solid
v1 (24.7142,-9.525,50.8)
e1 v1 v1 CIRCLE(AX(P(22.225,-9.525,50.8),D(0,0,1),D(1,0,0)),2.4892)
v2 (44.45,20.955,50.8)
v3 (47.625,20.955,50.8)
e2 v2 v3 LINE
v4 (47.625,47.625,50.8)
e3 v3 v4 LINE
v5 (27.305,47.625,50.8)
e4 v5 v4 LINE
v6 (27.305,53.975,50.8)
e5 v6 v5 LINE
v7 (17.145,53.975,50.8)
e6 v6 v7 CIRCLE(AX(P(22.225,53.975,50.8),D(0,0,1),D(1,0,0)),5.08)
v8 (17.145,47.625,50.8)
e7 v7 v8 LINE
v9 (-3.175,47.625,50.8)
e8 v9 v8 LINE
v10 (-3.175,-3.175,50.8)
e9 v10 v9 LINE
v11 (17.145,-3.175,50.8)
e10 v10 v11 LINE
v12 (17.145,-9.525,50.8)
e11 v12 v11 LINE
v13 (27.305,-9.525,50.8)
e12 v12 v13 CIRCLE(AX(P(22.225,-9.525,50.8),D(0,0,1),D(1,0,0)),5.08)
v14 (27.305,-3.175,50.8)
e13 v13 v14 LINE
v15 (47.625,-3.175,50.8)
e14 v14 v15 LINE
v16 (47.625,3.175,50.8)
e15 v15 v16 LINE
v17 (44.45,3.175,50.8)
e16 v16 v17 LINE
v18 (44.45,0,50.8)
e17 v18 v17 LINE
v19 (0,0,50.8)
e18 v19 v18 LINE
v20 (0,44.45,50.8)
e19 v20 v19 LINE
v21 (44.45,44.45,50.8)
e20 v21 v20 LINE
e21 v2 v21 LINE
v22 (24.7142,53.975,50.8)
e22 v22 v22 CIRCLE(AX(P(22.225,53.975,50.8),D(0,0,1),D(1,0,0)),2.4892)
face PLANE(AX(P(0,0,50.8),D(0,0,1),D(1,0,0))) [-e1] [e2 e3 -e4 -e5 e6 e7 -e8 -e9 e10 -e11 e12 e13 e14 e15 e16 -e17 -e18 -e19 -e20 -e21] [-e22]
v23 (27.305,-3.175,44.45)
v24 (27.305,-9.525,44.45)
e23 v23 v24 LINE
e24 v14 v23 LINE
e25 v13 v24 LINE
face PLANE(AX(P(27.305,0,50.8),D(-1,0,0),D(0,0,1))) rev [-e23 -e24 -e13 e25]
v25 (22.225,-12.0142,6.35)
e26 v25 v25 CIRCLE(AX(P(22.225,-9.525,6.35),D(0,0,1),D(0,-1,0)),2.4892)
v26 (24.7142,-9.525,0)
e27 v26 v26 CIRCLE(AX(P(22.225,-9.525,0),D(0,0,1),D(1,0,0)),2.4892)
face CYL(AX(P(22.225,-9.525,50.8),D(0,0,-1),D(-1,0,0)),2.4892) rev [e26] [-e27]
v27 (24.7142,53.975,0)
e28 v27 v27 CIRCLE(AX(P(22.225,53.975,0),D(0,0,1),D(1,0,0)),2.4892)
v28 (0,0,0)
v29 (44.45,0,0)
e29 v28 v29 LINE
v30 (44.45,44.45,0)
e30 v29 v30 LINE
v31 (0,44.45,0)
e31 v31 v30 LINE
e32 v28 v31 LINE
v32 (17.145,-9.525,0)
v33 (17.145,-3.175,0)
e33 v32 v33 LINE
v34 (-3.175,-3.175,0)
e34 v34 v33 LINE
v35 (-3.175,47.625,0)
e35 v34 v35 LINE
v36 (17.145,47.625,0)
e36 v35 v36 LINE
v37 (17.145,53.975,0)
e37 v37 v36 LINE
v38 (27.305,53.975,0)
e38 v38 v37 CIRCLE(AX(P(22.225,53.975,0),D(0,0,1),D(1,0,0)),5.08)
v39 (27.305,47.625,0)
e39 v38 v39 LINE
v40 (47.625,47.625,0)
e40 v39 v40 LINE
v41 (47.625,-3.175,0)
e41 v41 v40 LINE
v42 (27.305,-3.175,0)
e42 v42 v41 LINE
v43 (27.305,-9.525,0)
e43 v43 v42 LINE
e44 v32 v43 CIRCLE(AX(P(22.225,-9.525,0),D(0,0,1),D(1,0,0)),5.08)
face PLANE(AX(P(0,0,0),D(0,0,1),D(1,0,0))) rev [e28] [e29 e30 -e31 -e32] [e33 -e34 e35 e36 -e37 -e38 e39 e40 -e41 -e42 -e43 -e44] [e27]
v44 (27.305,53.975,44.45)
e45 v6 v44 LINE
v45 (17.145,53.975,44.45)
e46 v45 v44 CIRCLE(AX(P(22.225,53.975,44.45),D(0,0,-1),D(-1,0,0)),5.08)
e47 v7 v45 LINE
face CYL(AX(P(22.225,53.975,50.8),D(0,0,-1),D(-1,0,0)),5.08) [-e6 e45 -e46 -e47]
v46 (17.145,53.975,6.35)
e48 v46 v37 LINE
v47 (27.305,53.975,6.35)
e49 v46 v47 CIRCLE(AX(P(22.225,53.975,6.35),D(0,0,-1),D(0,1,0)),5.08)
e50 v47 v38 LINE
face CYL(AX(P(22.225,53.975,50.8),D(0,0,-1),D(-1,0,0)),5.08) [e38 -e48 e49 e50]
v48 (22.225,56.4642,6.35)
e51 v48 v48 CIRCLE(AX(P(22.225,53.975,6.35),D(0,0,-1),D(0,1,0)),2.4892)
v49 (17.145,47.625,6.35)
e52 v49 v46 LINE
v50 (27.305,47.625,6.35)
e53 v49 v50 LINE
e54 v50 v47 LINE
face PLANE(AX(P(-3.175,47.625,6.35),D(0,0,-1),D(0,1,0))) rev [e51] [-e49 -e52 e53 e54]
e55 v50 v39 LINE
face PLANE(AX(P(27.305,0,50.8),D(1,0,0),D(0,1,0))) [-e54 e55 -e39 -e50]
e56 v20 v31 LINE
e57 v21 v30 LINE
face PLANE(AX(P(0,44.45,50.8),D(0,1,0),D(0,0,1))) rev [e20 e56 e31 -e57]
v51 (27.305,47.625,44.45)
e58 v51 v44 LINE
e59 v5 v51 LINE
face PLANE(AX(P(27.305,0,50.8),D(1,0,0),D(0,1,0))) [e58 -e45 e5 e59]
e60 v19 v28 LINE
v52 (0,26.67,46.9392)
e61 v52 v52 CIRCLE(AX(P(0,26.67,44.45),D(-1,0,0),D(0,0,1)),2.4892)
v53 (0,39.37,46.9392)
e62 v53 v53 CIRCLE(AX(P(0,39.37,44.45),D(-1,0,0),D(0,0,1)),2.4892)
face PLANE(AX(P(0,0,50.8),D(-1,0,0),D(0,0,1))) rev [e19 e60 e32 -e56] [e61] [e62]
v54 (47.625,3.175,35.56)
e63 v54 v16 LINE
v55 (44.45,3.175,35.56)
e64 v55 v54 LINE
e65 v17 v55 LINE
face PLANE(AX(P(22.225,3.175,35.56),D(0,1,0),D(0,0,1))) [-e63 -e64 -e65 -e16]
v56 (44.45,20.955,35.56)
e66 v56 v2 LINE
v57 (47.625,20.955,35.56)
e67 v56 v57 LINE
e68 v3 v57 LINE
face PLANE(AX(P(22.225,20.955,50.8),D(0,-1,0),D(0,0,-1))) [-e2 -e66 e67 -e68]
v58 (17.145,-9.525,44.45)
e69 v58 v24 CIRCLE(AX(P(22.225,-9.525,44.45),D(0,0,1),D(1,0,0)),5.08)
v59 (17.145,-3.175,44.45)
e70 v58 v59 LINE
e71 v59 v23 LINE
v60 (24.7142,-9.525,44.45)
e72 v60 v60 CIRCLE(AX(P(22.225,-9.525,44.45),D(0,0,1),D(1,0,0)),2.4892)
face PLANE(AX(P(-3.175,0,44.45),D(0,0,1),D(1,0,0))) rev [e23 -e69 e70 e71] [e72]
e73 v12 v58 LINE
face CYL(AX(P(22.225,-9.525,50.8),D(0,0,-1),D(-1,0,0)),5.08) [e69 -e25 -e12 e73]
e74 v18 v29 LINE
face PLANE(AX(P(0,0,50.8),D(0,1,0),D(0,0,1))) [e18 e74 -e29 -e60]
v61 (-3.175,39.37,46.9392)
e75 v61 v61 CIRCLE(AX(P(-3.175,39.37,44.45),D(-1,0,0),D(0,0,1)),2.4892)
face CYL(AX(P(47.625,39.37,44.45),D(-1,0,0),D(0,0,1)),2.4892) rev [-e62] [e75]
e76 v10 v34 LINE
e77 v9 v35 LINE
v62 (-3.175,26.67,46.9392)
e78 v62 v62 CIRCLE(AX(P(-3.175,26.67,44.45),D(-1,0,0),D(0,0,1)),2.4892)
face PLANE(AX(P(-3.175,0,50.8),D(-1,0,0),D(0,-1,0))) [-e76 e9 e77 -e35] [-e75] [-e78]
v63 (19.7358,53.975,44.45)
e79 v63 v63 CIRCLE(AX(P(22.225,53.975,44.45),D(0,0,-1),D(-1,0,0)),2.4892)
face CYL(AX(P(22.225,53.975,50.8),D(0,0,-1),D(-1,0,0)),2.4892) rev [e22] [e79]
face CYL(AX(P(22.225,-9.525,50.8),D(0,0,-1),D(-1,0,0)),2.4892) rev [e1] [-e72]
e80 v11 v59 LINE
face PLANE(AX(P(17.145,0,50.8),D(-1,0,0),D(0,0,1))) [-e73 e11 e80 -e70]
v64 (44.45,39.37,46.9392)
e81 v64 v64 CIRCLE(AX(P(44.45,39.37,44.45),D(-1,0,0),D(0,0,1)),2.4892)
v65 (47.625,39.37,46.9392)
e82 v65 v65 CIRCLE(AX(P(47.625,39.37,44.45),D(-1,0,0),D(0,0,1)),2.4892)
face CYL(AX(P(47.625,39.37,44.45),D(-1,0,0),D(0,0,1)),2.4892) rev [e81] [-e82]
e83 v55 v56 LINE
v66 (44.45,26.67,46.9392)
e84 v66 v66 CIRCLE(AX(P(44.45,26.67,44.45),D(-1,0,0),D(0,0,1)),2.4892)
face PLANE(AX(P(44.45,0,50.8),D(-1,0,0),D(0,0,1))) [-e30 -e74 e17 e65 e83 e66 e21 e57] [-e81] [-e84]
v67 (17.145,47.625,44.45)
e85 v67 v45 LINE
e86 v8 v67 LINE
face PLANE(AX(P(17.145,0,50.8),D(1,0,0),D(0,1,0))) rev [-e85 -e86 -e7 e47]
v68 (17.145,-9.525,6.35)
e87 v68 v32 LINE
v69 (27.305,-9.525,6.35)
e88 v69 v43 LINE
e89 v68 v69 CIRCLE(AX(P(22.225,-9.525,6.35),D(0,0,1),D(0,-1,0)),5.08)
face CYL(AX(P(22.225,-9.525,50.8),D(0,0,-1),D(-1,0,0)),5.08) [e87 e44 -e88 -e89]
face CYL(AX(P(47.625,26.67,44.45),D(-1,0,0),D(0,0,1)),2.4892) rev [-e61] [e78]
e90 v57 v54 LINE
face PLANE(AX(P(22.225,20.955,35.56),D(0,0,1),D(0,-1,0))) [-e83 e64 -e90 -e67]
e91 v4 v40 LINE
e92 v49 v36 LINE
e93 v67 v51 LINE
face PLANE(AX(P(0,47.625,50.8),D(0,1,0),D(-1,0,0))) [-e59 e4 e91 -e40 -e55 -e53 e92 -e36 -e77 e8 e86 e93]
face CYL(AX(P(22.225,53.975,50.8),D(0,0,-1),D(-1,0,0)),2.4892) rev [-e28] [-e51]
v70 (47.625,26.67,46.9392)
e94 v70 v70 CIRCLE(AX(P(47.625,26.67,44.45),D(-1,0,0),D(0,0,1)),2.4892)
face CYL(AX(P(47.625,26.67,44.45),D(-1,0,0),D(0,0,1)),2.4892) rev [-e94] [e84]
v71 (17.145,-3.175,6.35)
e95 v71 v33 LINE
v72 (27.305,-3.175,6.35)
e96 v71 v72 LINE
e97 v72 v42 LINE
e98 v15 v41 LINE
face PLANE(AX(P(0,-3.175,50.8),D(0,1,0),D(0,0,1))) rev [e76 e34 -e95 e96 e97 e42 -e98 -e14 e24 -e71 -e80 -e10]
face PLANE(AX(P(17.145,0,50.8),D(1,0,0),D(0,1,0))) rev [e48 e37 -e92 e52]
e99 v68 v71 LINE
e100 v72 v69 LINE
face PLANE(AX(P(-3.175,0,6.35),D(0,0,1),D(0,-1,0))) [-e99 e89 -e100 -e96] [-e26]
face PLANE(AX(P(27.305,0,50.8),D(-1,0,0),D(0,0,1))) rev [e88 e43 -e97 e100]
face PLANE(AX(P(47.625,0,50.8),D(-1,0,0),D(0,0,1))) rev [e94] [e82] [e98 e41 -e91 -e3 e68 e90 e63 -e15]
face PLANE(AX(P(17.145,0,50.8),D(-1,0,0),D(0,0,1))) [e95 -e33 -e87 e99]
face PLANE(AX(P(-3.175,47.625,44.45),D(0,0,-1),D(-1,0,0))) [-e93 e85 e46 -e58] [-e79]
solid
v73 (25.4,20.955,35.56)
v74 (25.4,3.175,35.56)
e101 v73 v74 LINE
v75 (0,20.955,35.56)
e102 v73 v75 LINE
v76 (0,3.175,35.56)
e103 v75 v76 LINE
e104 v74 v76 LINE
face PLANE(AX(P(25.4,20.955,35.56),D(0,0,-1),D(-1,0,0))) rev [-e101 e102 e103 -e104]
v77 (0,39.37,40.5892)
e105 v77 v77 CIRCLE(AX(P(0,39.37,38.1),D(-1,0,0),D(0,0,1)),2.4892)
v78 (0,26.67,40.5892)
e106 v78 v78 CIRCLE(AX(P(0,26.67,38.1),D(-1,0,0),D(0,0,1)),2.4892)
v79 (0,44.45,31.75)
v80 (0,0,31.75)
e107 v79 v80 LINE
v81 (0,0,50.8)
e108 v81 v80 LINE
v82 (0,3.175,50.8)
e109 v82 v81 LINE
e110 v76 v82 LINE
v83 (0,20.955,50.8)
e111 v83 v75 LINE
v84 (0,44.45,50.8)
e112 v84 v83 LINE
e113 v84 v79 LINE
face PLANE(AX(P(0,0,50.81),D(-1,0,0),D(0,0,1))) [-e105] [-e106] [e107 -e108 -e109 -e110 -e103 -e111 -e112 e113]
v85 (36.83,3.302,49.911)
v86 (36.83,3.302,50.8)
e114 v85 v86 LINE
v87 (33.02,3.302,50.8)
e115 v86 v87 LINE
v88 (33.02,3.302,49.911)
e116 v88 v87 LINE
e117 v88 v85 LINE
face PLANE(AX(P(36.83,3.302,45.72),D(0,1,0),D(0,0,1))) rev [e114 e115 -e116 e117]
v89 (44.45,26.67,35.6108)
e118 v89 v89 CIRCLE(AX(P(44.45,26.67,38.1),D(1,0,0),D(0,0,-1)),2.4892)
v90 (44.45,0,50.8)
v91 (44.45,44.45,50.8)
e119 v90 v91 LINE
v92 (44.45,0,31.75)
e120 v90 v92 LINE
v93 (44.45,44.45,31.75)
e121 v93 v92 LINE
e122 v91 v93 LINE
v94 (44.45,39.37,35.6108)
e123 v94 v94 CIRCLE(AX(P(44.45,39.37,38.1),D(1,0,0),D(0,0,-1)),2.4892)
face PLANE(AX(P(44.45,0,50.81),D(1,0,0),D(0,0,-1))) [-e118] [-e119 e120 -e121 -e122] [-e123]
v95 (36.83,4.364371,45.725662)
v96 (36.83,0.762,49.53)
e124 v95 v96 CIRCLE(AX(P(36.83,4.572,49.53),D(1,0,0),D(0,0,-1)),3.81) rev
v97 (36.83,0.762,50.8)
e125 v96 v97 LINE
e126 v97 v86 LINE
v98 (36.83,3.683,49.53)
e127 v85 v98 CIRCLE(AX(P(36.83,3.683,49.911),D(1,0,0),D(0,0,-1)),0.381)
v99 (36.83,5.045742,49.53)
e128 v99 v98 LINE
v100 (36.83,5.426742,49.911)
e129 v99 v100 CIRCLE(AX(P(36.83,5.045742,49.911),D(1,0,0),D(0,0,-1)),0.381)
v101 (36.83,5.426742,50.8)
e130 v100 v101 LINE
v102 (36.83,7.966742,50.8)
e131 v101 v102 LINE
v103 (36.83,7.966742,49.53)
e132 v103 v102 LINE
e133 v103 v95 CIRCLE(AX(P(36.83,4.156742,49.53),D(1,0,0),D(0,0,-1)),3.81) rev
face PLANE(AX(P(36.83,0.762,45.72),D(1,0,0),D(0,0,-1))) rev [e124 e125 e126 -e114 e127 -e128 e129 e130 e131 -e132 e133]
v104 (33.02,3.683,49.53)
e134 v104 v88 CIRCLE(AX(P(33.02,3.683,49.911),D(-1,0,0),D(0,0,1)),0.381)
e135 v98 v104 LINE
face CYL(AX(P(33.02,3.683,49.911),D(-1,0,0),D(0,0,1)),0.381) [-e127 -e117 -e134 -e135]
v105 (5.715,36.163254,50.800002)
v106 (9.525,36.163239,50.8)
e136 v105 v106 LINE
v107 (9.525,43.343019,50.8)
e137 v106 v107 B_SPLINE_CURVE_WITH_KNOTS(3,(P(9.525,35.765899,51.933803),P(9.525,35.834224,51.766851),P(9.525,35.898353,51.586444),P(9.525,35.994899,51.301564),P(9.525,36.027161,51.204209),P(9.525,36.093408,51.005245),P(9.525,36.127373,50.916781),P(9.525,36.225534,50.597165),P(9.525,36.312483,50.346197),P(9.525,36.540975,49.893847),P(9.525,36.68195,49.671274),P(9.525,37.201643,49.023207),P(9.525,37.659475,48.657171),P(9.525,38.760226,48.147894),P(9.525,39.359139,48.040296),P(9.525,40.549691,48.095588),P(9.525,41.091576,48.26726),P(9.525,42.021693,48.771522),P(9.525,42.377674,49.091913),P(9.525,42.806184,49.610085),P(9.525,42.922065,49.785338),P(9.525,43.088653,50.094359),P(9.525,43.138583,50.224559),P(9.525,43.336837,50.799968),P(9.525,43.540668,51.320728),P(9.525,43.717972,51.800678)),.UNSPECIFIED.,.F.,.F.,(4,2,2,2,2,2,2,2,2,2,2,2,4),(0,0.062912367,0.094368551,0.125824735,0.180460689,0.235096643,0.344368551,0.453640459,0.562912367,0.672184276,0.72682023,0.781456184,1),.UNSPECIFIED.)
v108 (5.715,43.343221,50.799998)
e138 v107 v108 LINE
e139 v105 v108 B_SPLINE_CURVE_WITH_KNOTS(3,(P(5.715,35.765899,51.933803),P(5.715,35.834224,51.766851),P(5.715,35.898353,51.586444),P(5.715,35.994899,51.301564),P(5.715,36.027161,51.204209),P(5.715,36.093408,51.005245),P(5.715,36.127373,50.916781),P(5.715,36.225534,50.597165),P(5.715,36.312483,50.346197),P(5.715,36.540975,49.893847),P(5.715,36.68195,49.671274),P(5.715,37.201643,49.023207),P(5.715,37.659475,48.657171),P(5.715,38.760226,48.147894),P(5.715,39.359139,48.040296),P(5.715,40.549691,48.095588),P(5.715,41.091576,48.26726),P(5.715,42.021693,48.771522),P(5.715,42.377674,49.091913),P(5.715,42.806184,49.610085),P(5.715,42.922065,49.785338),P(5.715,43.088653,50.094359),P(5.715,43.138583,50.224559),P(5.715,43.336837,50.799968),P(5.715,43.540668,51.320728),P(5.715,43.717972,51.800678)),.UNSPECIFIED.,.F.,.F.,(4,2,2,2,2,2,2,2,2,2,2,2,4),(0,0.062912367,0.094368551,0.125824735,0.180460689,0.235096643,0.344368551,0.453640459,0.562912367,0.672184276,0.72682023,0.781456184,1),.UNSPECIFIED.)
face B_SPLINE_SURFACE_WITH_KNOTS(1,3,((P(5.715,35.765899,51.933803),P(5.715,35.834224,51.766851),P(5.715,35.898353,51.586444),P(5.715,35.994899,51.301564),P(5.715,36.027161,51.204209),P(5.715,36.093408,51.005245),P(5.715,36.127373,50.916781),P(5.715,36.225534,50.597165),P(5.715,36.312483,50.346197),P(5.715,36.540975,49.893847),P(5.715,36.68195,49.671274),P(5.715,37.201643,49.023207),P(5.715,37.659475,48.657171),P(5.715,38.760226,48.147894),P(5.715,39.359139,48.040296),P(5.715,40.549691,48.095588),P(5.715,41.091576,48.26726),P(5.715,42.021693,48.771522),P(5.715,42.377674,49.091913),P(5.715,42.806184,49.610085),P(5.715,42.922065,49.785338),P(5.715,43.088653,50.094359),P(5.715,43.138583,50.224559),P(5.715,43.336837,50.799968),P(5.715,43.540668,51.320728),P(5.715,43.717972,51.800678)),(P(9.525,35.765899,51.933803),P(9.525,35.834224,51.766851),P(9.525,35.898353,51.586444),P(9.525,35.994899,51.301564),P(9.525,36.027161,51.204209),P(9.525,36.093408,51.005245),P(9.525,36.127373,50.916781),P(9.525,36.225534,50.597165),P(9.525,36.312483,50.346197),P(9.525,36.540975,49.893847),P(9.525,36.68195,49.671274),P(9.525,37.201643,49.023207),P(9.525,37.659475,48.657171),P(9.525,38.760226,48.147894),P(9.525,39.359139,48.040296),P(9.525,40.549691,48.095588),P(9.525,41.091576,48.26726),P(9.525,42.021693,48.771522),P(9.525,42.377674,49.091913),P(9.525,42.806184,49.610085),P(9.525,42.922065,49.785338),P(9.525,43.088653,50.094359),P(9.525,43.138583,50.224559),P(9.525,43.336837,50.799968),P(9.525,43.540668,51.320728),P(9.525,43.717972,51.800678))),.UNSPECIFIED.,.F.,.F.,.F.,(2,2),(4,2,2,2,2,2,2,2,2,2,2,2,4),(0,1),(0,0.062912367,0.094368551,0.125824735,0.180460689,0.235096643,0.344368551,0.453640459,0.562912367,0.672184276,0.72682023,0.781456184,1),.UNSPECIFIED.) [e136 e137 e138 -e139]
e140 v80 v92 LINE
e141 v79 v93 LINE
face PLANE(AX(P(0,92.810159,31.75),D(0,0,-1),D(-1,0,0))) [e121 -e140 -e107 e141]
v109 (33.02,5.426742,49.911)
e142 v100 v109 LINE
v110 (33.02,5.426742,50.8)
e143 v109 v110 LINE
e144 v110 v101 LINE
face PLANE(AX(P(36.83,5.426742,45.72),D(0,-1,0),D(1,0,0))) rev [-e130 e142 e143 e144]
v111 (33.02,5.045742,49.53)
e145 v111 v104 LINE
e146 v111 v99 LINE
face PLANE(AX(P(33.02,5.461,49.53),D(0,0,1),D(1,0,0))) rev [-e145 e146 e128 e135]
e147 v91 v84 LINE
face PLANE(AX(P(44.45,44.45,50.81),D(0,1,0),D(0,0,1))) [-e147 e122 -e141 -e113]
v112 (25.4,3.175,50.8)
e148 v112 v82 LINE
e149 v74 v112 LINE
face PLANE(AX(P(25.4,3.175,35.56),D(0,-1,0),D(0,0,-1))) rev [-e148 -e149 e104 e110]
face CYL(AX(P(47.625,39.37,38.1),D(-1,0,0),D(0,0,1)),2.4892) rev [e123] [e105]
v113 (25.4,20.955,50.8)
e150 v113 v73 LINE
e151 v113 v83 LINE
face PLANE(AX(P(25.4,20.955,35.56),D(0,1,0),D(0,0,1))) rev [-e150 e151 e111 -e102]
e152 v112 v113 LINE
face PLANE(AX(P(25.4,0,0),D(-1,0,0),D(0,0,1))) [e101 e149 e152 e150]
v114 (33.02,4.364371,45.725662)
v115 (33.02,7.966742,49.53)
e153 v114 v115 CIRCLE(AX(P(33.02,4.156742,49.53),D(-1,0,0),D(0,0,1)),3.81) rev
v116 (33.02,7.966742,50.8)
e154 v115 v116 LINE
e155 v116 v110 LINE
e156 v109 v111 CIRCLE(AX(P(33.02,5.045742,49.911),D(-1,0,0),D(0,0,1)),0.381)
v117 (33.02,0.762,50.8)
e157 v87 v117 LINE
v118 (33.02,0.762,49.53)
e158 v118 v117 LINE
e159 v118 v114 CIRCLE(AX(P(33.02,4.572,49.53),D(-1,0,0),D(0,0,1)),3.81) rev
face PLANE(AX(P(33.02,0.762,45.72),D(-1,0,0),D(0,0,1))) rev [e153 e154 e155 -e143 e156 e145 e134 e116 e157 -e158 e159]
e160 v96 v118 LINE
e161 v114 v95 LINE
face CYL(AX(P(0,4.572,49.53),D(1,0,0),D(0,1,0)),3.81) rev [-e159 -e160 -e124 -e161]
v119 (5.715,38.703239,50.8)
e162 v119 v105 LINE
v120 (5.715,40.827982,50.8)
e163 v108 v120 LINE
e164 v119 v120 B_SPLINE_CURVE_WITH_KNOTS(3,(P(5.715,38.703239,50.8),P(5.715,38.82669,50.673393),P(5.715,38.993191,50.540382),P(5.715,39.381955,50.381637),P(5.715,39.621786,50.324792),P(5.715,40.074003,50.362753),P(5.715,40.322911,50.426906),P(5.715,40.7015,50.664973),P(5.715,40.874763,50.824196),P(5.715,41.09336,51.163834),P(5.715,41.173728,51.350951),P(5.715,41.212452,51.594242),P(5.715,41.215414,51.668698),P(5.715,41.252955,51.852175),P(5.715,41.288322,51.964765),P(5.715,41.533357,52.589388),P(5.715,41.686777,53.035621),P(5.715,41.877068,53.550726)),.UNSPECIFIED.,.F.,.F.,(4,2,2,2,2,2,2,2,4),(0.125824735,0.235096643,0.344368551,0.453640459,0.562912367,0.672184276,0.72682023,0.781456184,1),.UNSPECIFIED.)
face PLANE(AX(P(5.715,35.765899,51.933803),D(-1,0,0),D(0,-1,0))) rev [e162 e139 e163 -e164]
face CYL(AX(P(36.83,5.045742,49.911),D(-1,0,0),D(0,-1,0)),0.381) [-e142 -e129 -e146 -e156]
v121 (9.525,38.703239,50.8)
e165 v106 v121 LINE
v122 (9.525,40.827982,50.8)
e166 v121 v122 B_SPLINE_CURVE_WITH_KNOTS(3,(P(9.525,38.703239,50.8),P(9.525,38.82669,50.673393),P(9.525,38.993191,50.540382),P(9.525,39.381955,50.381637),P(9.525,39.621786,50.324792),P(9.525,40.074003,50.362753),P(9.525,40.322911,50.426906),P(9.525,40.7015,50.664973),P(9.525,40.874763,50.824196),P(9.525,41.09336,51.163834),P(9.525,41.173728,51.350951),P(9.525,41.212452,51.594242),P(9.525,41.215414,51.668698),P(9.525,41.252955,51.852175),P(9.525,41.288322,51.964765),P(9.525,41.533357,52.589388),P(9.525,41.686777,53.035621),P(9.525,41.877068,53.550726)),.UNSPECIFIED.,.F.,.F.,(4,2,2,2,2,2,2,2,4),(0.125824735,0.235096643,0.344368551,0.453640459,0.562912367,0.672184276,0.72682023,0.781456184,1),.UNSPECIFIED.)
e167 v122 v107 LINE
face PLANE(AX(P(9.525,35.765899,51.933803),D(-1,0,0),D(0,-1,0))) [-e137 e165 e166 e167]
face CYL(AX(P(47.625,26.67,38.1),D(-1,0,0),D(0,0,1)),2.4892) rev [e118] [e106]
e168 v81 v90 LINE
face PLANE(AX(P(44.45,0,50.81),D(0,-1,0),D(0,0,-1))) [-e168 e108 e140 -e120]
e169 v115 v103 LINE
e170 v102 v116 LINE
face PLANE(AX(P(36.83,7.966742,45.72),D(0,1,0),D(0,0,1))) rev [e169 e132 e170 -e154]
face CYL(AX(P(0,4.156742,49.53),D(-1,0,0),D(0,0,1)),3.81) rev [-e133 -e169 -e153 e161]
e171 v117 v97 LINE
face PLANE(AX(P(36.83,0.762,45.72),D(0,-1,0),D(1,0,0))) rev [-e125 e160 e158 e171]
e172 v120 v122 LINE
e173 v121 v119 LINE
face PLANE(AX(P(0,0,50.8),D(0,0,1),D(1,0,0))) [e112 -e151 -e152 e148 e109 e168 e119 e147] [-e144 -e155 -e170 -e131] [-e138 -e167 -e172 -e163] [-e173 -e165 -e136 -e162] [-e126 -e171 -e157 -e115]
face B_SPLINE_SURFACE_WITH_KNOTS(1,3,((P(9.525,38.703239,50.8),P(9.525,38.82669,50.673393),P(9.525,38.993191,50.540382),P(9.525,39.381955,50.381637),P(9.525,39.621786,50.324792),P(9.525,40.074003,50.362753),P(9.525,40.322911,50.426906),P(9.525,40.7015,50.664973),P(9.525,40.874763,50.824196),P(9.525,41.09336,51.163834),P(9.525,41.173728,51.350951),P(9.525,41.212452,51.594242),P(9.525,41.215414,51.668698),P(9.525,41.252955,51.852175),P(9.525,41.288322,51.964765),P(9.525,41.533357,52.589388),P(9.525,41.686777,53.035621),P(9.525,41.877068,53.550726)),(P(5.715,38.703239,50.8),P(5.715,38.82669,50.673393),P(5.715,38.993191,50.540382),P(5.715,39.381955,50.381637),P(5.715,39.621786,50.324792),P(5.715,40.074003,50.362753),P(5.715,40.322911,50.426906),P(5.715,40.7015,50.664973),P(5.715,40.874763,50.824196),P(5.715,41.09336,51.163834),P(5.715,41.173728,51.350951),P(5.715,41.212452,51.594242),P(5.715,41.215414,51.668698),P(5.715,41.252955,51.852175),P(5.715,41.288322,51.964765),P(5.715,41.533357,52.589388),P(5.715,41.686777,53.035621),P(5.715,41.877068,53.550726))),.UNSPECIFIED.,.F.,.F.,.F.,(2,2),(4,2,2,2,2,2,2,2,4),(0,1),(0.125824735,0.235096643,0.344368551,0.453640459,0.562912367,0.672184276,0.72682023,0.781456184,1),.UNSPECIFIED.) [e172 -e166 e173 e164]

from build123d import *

# Parameters (mm, degrees)
SKETCH1_R              = 2.4892
SKETCH1_W              = 44.45
SKETCH1_H              = 44.45
BOSS_EXTRUDE2_DEPTH    = 50.8
SKETCH13_W             = 44.45
SKETCH13_H             = 19.05
BOSS_EXTRUDE3_DEPTH    = 44.45
SPLIT1_SURFACE_1_BACK  = 103.894
SPLIT1_SURFACE_1_DEPTH = 207.788
SPLIT1_SURFACE_2_BACK  = 103.894
SPLIT1_SURFACE_2_DEPTH = 207.788
SKETCH17_R             = 2.4892
CUT_EXTRUDE5_DEPTH     = 93.998779696
SKETCH15_W             = 15.24
SKETCH15_H             = 17.78
CUT_EXTRUDE4_DEPTH     = 25.4
SKETCH22_W             = 38.1
SKETCH22_H             = 11.759714853
SKETCH22_H_2           = 6.35
SKETCH22_H_3           = 50.8
CUT_EXTRUDE7_DEPTH     = 84.649049158
SKETCH25_R             = 2.4892
CUT_EXTRUDE8_DEPTH     = 92.303196275
SKETCH27_W             = 15.24
SKETCH27_H             = 17.78
CUT_EXTRUDE10_DEPTH    = 25.4
CUT_SWEEP8_START       = 5.715
CUT_SWEEP8_DEPTH       = 3.81
SKETCH43_W             = 3.81
SKETCH43_H             = 2.54
CUT_EXTRUDE11_DEPTH    = 5.08
SKETCH44_W             = 3.81
SKETCH44_H             = 2.54
CUT_EXTRUDE12_DEPTH    = 5.08
SKETCH45_W             = 3.81
SKETCH45_H             = 3.81
CUT_EXTRUDE14_DEPTH    = 2.159
FILLET1_R              = 3.81
FILLET3_R              = 0.381


# Read off the part's stored shape, not the designer's step: Cut-Sweep8
with BuildPart() as part:
    # Sketch1 → Boss-Extrude2 (new body)
    with BuildSketch(Plane.XY):
        with BuildLine():
            Line((-3.175, -3.175), (-3.175, 47.625))
            Line((-3.175, 47.625), (17.145, 47.625))
            Line((17.145, 47.625), (17.145, 53.975))
            ThreePointArc((17.145, 53.975), (22.225, 59.055), (27.305, 53.975))
            Line((27.305, 53.975), (27.305, 47.625))
            Line((27.305, 47.625), (47.625, 47.625))
            Line((47.625, 47.625), (47.625, -3.175))
            Line((47.625, -3.175), (27.305, -3.175))
            Line((27.305, -3.175), (27.305, -9.525))
            ThreePointArc((27.305, -9.525), (22.225, -14.605), (17.145, -9.525))
            Line((17.145, -9.525), (17.145, -3.175))
            Line((17.145, -3.175), (-3.175, -3.175))
        make_face()
        with Locations((22.225, 53.975)):
            Circle(SKETCH1_R, mode=Mode.SUBTRACT)
        with Locations((22.225, -9.525)):
            Circle(SKETCH1_R, mode=Mode.SUBTRACT)
        with Locations((22.225, 22.225)):
            Rectangle(SKETCH1_W, SKETCH1_H, mode=Mode.SUBTRACT)
    extrude(amount=BOSS_EXTRUDE2_DEPTH)

    # Sketch13 → Boss-Extrude3 (add)
    with BuildSketch(Plane(origin=(0, 0, 0), x_dir=(1, 0, 0), z_dir=(0, 1, 0))):
        with Locations((22.225, -41.275)):
            Rectangle(SKETCH13_W, SKETCH13_H)
    extrude(amount=BOSS_EXTRUDE3_DEPTH)


with BuildPart() as body_2:
    # Split1: the piece behind the surface
    add(part.part)
    # Split1 surface: a surface, the sketch's curves swept straight by 207.788 mm
    with BuildLine(Plane(origin=(0, 0, 31.75), x_dir=(-1, 0, 0), z_dir=(0, 0, -1)).offset(-SPLIT1_SURFACE_1_BACK), mode=Mode.PRIVATE) as split1_surface_1_path:
        Line((-44.45, 0), (0, 0))
        Line((0, 0), (0, 44.45))
        Line((0, 44.45), (-44.45, 44.45))
        Line((-44.45, 44.45), (-44.45, 0))
    split1_surface_1 = Shell.extrude(split1_surface_1_path.wire(), (0 * SPLIT1_SURFACE_1_DEPTH, 0 * SPLIT1_SURFACE_1_DEPTH, -1 * SPLIT1_SURFACE_1_DEPTH))
    split(bisect_by=split1_surface_1, keep=Keep.BOTTOM)

    # Sketch17 → Cut-Extrude5 (cut, through all)
    with BuildSketch(Plane.ZY.offset(3.175)):
        with Locations((44.45, 39.37)):
            Circle(SKETCH17_R)
        with Locations((44.45, 26.67)):
            Circle(SKETCH17_R)
    extrude(amount=-CUT_EXTRUDE5_DEPTH, mode=Mode.SUBTRACT)

    # Sketch15 → Cut-Extrude4 (cut)
    with BuildSketch(Plane(origin=(47.625, 0, 0), x_dir=(0, 0, -1), z_dir=(1, 0, 0))):
        with Locations((-43.18, 12.065)):
            Rectangle(SKETCH15_W, SKETCH15_H)
    extrude(amount=-CUT_EXTRUDE4_DEPTH, mode=Mode.SUBTRACT)

    # Sketch22 → Cut-Extrude7 (cut, through all)
    with BuildSketch(Plane(origin=(27.305, 0, 0), x_dir=(0, 0, -1), z_dir=(1, 0, 0))):
        with Locations((-25.4, -15.404857427)):
            Rectangle(SKETCH22_W, SKETCH22_H)
        with Locations((-25.4, -6.35)):
            Rectangle(SKETCH22_W, SKETCH22_H_2)
        with Locations((-25.4, 73.025)):
            Rectangle(SKETCH22_W, SKETCH22_H_3)
    extrude(amount=-CUT_EXTRUDE7_DEPTH, mode=Mode.SUBTRACT)


with BuildPart() as part_1:
    add(part.part)

    # Split1: split by a surface, the side it looks to stays
    # Split1 surface: a surface, the sketch's curves swept straight by 207.788 mm
    with BuildLine(Plane(origin=(0, 0, 31.75), x_dir=(-1, 0, 0), z_dir=(0, 0, -1)).offset(-SPLIT1_SURFACE_2_BACK), mode=Mode.PRIVATE) as split1_surface_2_path:
        Line((-44.45, 0), (0, 0))
        Line((0, 0), (0, 44.45))
        Line((0, 44.45), (-44.45, 44.45))
        Line((-44.45, 44.45), (-44.45, 0))
    split1_surface_2 = Shell.extrude(split1_surface_2_path.wire(), (0 * SPLIT1_SURFACE_2_DEPTH, 0 * SPLIT1_SURFACE_2_DEPTH, -1 * SPLIT1_SURFACE_2_DEPTH))
    split(bisect_by=split1_surface_2, keep=Keep.TOP)

    # Sketch25 → Cut-Extrude8 (cut, through all)
    with BuildSketch(Plane.ZY):
        with Locations((38.1, 39.37)):
            Circle(SKETCH25_R)
        with Locations((38.1, 26.67)):
            Circle(SKETCH25_R)
    extrude(amount=-CUT_EXTRUDE8_DEPTH, mode=Mode.SUBTRACT)

    # Sketch27 → Cut-Extrude10 (cut)
    with BuildSketch(Plane.ZY):
        with Locations((43.18, 12.065)):
            Rectangle(SKETCH27_W, SKETCH27_H)
    extrude(amount=-CUT_EXTRUDE10_DEPTH, mode=Mode.SUBTRACT)

    # Cut-Sweep8 outline → Cut-Sweep8 (cut)
    with BuildSketch(Plane.YZ.offset(CUT_SWEEP8_START)):
        with BuildLine():
            Line((38.703239312, 50.8), (36.163239312, 50.8))
            add(Edge.make_bspline(
                [(36.163239312, 50.8), (36.225534408, 50.597164917), (36.312483324, 50.346196771), (36.540975299, 49.893847377), (36.681949945, 49.671273895), (37.201643145, 49.02320701), (37.65947496, 48.657171163), (38.760225903, 48.147893995), (39.359139113, 48.040295964), (40.549690891, 48.09558808), (41.091576359, 48.267260343), (42.021692589, 48.771522476), (42.377673695, 49.091912743), (42.806183968, 49.610084567), (42.922064983, 49.785337738), (43.088653257, 50.094359328), (43.138582777, 50.224558866), (43.229332741, 50.487949571), (43.285126469, 50.642531241), (43.343215184, 50.800000001)],
                knots=[0.125824735, 0.125824735, 0.125824735, 0.125824735, 0.180460689, 0.180460689, 0.235096643, 0.235096643, 0.344368551, 0.344368551, 0.453640459, 0.453640459, 0.562912367, 0.562912367, 0.672184276, 0.672184276, 0.72682023, 0.72682023, 0.781456184, 0.781456184, 0.851866862, 0.851866862, 0.851866862, 0.851866862], degree=3))
            Line((43.343215184, 50.800000001), (40.827981558, 50.8))
            add(Edge.make_bspline(
                [(38.703239312, 50.8), (38.826689757, 50.673392723), (38.993190634, 50.54038206), (39.381954846, 50.381636812), (39.621785637, 50.324791943), (40.074002601, 50.362753286), (40.322910855, 50.426905702), (40.626904824, 50.618065), (40.735717985, 50.704946478), (40.827981558, 50.8)],
                knots=[0.125824735, 0.125824735, 0.125824735, 0.125824735, 0.235096643, 0.235096643, 0.344368551, 0.344368551, 0.453640459, 0.453640459, 0.519851531, 0.519851531, 0.519851531, 0.519851531], degree=3))
        make_face()
    extrude(amount=CUT_SWEEP8_DEPTH, mode=Mode.SUBTRACT)

    # Sketch43 → Cut-Extrude11 (cut)
    with BuildSketch(Plane.XY.offset(50.8)):
        with Locations((34.925, 2.032)):
            Rectangle(SKETCH43_W, SKETCH43_H)
    extrude(amount=-CUT_EXTRUDE11_DEPTH, mode=Mode.SUBTRACT)

    # Sketch44 → Cut-Extrude12 (cut)
    with BuildSketch(Plane.XY.offset(50.8)):
        with Locations((34.925, 6.696742258)):
            Rectangle(SKETCH44_W, SKETCH44_H)
    extrude(amount=-CUT_EXTRUDE12_DEPTH, mode=Mode.SUBTRACT)

    # Sketch45 → Cut-Extrude14 (cut)
    with BuildSketch(Plane.XZ.offset(-3.302)):
        with Locations((34.925, 47.625)):
            Rectangle(SKETCH45_W, SKETCH45_H)
    extrude(amount=-CUT_EXTRUDE14_DEPTH, mode=Mode.SUBTRACT)

    # Fillet1
    # the kernel refuses this fillet: 3.81 mm, written as the material it adds along each edge
    with BuildSketch(Plane(origin=(33.02, 7.966742258, 45.72), x_dir=(0, 0, 1), z_dir=(1, 0, 0))) as fillet1_piece_1:
        with BuildLine():
            CenterArc((FILLET1_R, FILLET1_R), FILLET1_R, 180, 90)
            Line((0, FILLET1_R), (-FILLET1_R * 0.02, FILLET1_R))
            Line((-FILLET1_R * 0.02, FILLET1_R), (-FILLET1_R * 0.02, -FILLET1_R * 0.02))
            Line((-FILLET1_R * 0.02, -FILLET1_R * 0.02), (FILLET1_R, -FILLET1_R * 0.02))
            Line((FILLET1_R, -FILLET1_R * 0.02), (FILLET1_R, 0))
        make_face()
    extrude(amount=3.81)
    with BuildSketch(Plane(origin=(36.83, 0.762, 45.72), x_dir=(0, 1, 0), z_dir=(-1, 0, 0))) as fillet1_piece_2:
        with BuildLine():
            CenterArc((FILLET1_R, -FILLET1_R), FILLET1_R, 90, 90)
            Line((0, -FILLET1_R), (-FILLET1_R * 0.02, -FILLET1_R))
            Line((-FILLET1_R * 0.02, -FILLET1_R), (-FILLET1_R * 0.02, FILLET1_R * 0.02))
            Line((-FILLET1_R * 0.02, FILLET1_R * 0.02), (FILLET1_R, FILLET1_R * 0.02))
            Line((FILLET1_R, FILLET1_R * 0.02), (FILLET1_R, 0))
        make_face()
    extrude(amount=3.81)

    # Fillet3
    fillet3_edges = [part_1.edges().sort_by_distance(p)[0] for p in [
        (34.925, 5.426742258, 49.53),
        (34.925, 3.302, 49.53),
    ]]
    fillet(fillet3_edges, radius=FILLET3_R)


solid = Compound([body_2.part, part_1.part])
